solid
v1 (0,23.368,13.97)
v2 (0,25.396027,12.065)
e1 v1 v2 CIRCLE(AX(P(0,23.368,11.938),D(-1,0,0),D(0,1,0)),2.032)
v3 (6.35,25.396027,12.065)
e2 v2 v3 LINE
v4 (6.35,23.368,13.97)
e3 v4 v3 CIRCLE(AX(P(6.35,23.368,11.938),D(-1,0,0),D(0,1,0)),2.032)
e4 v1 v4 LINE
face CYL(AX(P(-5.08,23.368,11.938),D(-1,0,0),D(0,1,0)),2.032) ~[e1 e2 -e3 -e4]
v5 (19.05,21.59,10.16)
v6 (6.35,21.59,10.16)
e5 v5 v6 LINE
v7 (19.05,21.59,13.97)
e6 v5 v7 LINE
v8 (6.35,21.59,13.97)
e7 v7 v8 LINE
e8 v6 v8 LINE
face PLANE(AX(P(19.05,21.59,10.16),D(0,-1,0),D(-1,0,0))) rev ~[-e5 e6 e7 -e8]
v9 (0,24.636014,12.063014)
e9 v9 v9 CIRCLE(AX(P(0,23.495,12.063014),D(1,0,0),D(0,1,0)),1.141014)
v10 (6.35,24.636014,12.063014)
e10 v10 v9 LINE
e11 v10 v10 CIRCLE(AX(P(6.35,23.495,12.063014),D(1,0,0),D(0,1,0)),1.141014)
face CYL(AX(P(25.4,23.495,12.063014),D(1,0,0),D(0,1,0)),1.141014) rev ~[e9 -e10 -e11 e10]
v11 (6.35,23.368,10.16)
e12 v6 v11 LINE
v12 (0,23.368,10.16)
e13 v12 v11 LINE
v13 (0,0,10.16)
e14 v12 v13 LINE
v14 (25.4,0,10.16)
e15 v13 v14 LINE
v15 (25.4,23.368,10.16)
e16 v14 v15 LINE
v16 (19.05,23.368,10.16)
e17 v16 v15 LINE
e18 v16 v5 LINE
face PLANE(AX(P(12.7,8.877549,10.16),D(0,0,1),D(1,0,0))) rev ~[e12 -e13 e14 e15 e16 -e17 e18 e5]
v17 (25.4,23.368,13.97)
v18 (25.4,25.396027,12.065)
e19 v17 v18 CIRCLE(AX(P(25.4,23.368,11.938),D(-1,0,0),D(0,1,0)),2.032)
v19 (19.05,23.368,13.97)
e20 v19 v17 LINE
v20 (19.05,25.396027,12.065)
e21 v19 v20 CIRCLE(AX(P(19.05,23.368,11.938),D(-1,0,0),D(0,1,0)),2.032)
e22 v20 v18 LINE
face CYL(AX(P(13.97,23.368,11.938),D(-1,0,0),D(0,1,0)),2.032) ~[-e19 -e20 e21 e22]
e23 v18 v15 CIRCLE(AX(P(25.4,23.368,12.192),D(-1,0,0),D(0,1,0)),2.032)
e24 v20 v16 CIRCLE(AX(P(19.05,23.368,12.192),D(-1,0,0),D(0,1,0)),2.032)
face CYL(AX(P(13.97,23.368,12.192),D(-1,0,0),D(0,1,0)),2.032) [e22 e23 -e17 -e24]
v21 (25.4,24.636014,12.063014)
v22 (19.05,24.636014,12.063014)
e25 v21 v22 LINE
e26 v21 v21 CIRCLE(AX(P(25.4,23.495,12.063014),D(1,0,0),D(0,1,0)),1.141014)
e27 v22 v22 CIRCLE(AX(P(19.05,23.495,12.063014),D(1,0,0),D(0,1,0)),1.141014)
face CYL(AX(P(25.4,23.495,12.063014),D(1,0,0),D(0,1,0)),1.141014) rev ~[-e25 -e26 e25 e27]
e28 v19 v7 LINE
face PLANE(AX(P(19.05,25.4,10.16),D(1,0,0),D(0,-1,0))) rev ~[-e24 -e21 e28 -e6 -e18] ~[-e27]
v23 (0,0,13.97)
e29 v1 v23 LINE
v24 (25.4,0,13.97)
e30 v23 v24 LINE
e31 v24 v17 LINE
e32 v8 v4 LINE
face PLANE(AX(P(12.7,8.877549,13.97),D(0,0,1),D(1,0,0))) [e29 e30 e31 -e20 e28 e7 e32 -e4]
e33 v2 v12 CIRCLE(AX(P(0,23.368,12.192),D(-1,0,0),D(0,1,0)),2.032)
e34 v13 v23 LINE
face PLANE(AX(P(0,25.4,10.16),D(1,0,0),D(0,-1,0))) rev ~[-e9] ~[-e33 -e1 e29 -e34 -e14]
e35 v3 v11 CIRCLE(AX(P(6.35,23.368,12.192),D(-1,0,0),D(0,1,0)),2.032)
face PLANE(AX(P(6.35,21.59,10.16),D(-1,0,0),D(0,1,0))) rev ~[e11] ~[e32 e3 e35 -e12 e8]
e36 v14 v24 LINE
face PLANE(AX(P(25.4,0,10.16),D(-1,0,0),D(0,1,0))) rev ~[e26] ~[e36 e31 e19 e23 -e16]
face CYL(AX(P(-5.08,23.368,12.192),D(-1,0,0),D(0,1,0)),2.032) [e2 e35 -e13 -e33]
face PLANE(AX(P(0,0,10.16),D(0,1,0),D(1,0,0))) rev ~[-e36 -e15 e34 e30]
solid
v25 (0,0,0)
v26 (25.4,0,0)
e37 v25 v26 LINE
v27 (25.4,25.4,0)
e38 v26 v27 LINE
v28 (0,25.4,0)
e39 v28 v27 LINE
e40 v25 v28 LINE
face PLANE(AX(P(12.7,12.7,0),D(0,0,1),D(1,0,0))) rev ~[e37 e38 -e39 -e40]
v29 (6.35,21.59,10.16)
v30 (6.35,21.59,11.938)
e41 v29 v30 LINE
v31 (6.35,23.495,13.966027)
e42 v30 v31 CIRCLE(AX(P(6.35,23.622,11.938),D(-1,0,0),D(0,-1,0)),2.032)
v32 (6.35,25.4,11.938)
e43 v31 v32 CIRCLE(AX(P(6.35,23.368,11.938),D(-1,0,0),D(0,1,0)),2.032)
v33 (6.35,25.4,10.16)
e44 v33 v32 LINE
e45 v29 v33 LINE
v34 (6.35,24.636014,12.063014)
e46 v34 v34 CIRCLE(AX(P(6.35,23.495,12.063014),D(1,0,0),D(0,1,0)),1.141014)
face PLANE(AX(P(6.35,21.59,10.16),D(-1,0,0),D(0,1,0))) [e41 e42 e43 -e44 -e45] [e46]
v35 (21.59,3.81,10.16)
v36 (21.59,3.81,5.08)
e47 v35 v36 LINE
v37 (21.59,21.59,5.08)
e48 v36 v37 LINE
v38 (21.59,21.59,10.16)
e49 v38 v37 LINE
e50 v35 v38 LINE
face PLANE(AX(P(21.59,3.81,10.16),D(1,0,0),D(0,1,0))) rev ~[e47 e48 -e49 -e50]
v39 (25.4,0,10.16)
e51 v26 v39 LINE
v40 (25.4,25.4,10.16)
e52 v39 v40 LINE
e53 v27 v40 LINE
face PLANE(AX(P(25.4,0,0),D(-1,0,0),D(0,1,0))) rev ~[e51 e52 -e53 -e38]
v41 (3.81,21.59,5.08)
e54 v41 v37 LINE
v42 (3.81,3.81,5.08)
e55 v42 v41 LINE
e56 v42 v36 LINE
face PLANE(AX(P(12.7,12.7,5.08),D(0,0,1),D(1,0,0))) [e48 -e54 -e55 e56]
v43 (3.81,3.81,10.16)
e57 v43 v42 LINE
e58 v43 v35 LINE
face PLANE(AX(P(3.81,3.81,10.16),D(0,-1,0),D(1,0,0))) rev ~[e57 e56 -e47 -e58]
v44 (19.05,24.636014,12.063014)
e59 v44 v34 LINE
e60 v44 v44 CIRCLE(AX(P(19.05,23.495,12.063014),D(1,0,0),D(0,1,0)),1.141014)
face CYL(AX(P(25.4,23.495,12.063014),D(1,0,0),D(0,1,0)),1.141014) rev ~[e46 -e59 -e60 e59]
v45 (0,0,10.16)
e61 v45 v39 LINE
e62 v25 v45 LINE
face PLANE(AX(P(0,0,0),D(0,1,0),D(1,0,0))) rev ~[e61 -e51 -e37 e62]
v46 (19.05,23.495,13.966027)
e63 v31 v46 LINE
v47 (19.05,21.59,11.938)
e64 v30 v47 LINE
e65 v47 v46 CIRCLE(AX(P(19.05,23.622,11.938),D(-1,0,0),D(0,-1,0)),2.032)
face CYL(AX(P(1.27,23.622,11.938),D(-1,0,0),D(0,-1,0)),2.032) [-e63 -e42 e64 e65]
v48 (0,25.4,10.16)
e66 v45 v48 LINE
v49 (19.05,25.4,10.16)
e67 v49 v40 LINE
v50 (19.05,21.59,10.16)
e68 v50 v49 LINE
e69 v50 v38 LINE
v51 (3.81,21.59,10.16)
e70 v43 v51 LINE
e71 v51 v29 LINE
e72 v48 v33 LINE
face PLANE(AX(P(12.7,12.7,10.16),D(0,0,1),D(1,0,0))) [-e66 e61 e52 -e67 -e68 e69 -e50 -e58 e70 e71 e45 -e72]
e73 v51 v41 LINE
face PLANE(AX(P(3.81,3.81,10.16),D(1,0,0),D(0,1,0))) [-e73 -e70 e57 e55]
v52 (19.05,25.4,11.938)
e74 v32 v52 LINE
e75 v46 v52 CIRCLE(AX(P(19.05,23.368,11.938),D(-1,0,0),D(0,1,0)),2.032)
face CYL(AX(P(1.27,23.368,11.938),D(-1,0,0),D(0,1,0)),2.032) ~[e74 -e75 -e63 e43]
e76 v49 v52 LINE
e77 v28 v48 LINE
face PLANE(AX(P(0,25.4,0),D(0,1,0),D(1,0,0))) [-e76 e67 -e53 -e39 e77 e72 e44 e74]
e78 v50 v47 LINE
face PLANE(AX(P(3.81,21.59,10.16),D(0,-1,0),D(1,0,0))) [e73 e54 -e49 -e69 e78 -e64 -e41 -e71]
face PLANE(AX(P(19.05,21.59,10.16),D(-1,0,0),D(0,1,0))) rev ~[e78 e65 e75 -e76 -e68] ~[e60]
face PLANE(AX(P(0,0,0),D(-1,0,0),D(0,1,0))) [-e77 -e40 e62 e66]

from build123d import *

# Parameters (mm, degrees)
F0_W        = 25.4
F0_H        = 25.4
F1_DEPTH    = 10.16
F2_W        = 17.78
F2_H        = 17.78
F3_DEPTH    = 5.08
F4_W        = 6.35
F4_H        = 3.81
F5_DEPTH    = 3.81
F7_DEPTH    = 3.81
F8_T1_DEPTH = 16.51
F8_T3_DEPTH = 16.51
F9_T1_DEPTH = 22.86
F10_R       = 1.1410136833
F11_DEPTH   = 25.4


# Not quite as in the source:
# - a fillet or chamfer that OpenCascade refuses, or shapes differently, is made with other operations: its cross-section is extruded or revolved along the edge and cut away or added


with BuildPart() as f1:
    # F0 (on Top) → F1 (new body)
    with BuildSketch(Plane.XY):
        with Locations((12.7, 12.7)):
            Rectangle(F0_W, F0_H)
    extrude(amount=F1_DEPTH)

    # F2 (on face) → F3 (cut)
    with BuildSketch(Plane.XY.offset(10.16)):
        with Locations((12.7, 12.7)):
            Rectangle(F2_W, F2_H)
    extrude(amount=-F3_DEPTH, mode=Mode.SUBTRACT)

    # F4 (on face) → F5 (join)
    with BuildSketch(Plane.XY.offset(10.16)):
        with Locations((9.525, 23.495)):
            Rectangle(F4_W, F4_H)
        with Locations((15.875, 23.495)):
            Rectangle(F4_W, F4_H)
    extrude(amount=F5_DEPTH)

    # F9: fillet of radius 2.032 on 2 edges, made by hand

    # F9_s2 → F9_t1 (cut)
    with BuildSketch(Plane.YZ.offset(1.27)):
        with BuildLine():
            ThreePointArc((21.59, 11.938), (22.1851590206, 13.3748409794), (23.622, 13.97))
            Line((23.622, 13.97), (21.59, 13.97))
            Line((21.59, 13.97), (21.59, 11.938))
        make_face()
        with BuildLine():
            ThreePointArc((25.4, 11.938), (24.8048409794, 13.3748409794), (23.368, 13.97))
            Line((23.368, 13.97), (25.4, 13.97))
            Line((25.4, 13.97), (25.4, 11.938))
        make_face()
    extrude(amount=F9_T1_DEPTH, mode=Mode.SUBTRACT)


with BuildPart() as f7:
    # F6 (on face) → F7 (new body)
    with BuildSketch(Plane.XY.offset(10.16)):
        Polygon((3.81, 21.59), (0, 21.59), (0, 0), (25.4, 0), (25.4, 21.59), (21.59, 21.59), (21.59, 3.81), (3.81, 3.81), align=None)
        Polygon((6.35, 21.59), (3.81, 21.59), (3.81, 3.81), (21.59, 3.81), (21.59, 21.59), (19.05, 21.59), align=None)
        Polygon((19.05, 25.4), (19.05, 21.59), (21.59, 21.59), (25.4, 21.59), (25.4, 25.4), align=None)
        Polygon((0, 25.4), (0, 21.59), (3.81, 21.59), (6.35, 21.59), (6.35, 25.4), align=None)
    extrude(amount=F7_DEPTH)

    # F8: fillet of radius 2.032 on 4 edges, made by hand

    # F8_s2 → F8_t1 (cut)
    with BuildSketch(Plane.YZ.offset(-5.08)):
        with BuildLine():
            ThreePointArc((25.4, 12.192), (24.8048409794, 10.7551590206), (23.368, 10.16))
            Line((23.368, 10.16), (25.4, 10.16))
            Line((25.4, 10.16), (25.4, 12.192))
        make_face()
        with BuildLine():
            ThreePointArc((25.4, 11.938), (24.8048409794, 13.3748409794), (23.368, 13.97))
            Line((23.368, 13.97), (25.4, 13.97))
            Line((25.4, 13.97), (25.4, 11.938))
        make_face()
    extrude(amount=F8_T1_DEPTH, mode=Mode.SUBTRACT)

    # F8_s4 → F8_t3 (cut)
    with BuildSketch(Plane.YZ.offset(13.97)):
        with BuildLine():
            ThreePointArc((25.4, 11.938), (24.8048409794, 13.3748409794), (23.368, 13.97))
            Line((23.368, 13.97), (25.4, 13.97))
            Line((25.4, 13.97), (25.4, 11.938))
        make_face()
        with BuildLine():
            ThreePointArc((25.4, 12.192), (24.8048409794, 10.7551590206), (23.368, 10.16))
            Line((23.368, 10.16), (25.4, 10.16))
            Line((25.4, 10.16), (25.4, 12.192))
        make_face()
    extrude(amount=F8_T3_DEPTH, mode=Mode.SUBTRACT)


with BuildPart() as f11_tool:
    # F10 (on face) → F11 (new body)
    with BuildSketch(Plane.YZ.offset(25.4)):
        with Locations((23.495, 12.0630136833)):
            Circle(F10_R)
    extrude(amount=-F11_DEPTH)


with BuildPart() as f1_1:
    add(f1.part)

    # F11: cut by f11_tool
    add(f11_tool.part, mode=Mode.SUBTRACT)


with BuildPart() as f7_1:
    add(f7.part)

    # F11: cut by f11_tool
    add(f11_tool.part, mode=Mode.SUBTRACT)


solid = Compound([f1_1.part, f7_1.part])
